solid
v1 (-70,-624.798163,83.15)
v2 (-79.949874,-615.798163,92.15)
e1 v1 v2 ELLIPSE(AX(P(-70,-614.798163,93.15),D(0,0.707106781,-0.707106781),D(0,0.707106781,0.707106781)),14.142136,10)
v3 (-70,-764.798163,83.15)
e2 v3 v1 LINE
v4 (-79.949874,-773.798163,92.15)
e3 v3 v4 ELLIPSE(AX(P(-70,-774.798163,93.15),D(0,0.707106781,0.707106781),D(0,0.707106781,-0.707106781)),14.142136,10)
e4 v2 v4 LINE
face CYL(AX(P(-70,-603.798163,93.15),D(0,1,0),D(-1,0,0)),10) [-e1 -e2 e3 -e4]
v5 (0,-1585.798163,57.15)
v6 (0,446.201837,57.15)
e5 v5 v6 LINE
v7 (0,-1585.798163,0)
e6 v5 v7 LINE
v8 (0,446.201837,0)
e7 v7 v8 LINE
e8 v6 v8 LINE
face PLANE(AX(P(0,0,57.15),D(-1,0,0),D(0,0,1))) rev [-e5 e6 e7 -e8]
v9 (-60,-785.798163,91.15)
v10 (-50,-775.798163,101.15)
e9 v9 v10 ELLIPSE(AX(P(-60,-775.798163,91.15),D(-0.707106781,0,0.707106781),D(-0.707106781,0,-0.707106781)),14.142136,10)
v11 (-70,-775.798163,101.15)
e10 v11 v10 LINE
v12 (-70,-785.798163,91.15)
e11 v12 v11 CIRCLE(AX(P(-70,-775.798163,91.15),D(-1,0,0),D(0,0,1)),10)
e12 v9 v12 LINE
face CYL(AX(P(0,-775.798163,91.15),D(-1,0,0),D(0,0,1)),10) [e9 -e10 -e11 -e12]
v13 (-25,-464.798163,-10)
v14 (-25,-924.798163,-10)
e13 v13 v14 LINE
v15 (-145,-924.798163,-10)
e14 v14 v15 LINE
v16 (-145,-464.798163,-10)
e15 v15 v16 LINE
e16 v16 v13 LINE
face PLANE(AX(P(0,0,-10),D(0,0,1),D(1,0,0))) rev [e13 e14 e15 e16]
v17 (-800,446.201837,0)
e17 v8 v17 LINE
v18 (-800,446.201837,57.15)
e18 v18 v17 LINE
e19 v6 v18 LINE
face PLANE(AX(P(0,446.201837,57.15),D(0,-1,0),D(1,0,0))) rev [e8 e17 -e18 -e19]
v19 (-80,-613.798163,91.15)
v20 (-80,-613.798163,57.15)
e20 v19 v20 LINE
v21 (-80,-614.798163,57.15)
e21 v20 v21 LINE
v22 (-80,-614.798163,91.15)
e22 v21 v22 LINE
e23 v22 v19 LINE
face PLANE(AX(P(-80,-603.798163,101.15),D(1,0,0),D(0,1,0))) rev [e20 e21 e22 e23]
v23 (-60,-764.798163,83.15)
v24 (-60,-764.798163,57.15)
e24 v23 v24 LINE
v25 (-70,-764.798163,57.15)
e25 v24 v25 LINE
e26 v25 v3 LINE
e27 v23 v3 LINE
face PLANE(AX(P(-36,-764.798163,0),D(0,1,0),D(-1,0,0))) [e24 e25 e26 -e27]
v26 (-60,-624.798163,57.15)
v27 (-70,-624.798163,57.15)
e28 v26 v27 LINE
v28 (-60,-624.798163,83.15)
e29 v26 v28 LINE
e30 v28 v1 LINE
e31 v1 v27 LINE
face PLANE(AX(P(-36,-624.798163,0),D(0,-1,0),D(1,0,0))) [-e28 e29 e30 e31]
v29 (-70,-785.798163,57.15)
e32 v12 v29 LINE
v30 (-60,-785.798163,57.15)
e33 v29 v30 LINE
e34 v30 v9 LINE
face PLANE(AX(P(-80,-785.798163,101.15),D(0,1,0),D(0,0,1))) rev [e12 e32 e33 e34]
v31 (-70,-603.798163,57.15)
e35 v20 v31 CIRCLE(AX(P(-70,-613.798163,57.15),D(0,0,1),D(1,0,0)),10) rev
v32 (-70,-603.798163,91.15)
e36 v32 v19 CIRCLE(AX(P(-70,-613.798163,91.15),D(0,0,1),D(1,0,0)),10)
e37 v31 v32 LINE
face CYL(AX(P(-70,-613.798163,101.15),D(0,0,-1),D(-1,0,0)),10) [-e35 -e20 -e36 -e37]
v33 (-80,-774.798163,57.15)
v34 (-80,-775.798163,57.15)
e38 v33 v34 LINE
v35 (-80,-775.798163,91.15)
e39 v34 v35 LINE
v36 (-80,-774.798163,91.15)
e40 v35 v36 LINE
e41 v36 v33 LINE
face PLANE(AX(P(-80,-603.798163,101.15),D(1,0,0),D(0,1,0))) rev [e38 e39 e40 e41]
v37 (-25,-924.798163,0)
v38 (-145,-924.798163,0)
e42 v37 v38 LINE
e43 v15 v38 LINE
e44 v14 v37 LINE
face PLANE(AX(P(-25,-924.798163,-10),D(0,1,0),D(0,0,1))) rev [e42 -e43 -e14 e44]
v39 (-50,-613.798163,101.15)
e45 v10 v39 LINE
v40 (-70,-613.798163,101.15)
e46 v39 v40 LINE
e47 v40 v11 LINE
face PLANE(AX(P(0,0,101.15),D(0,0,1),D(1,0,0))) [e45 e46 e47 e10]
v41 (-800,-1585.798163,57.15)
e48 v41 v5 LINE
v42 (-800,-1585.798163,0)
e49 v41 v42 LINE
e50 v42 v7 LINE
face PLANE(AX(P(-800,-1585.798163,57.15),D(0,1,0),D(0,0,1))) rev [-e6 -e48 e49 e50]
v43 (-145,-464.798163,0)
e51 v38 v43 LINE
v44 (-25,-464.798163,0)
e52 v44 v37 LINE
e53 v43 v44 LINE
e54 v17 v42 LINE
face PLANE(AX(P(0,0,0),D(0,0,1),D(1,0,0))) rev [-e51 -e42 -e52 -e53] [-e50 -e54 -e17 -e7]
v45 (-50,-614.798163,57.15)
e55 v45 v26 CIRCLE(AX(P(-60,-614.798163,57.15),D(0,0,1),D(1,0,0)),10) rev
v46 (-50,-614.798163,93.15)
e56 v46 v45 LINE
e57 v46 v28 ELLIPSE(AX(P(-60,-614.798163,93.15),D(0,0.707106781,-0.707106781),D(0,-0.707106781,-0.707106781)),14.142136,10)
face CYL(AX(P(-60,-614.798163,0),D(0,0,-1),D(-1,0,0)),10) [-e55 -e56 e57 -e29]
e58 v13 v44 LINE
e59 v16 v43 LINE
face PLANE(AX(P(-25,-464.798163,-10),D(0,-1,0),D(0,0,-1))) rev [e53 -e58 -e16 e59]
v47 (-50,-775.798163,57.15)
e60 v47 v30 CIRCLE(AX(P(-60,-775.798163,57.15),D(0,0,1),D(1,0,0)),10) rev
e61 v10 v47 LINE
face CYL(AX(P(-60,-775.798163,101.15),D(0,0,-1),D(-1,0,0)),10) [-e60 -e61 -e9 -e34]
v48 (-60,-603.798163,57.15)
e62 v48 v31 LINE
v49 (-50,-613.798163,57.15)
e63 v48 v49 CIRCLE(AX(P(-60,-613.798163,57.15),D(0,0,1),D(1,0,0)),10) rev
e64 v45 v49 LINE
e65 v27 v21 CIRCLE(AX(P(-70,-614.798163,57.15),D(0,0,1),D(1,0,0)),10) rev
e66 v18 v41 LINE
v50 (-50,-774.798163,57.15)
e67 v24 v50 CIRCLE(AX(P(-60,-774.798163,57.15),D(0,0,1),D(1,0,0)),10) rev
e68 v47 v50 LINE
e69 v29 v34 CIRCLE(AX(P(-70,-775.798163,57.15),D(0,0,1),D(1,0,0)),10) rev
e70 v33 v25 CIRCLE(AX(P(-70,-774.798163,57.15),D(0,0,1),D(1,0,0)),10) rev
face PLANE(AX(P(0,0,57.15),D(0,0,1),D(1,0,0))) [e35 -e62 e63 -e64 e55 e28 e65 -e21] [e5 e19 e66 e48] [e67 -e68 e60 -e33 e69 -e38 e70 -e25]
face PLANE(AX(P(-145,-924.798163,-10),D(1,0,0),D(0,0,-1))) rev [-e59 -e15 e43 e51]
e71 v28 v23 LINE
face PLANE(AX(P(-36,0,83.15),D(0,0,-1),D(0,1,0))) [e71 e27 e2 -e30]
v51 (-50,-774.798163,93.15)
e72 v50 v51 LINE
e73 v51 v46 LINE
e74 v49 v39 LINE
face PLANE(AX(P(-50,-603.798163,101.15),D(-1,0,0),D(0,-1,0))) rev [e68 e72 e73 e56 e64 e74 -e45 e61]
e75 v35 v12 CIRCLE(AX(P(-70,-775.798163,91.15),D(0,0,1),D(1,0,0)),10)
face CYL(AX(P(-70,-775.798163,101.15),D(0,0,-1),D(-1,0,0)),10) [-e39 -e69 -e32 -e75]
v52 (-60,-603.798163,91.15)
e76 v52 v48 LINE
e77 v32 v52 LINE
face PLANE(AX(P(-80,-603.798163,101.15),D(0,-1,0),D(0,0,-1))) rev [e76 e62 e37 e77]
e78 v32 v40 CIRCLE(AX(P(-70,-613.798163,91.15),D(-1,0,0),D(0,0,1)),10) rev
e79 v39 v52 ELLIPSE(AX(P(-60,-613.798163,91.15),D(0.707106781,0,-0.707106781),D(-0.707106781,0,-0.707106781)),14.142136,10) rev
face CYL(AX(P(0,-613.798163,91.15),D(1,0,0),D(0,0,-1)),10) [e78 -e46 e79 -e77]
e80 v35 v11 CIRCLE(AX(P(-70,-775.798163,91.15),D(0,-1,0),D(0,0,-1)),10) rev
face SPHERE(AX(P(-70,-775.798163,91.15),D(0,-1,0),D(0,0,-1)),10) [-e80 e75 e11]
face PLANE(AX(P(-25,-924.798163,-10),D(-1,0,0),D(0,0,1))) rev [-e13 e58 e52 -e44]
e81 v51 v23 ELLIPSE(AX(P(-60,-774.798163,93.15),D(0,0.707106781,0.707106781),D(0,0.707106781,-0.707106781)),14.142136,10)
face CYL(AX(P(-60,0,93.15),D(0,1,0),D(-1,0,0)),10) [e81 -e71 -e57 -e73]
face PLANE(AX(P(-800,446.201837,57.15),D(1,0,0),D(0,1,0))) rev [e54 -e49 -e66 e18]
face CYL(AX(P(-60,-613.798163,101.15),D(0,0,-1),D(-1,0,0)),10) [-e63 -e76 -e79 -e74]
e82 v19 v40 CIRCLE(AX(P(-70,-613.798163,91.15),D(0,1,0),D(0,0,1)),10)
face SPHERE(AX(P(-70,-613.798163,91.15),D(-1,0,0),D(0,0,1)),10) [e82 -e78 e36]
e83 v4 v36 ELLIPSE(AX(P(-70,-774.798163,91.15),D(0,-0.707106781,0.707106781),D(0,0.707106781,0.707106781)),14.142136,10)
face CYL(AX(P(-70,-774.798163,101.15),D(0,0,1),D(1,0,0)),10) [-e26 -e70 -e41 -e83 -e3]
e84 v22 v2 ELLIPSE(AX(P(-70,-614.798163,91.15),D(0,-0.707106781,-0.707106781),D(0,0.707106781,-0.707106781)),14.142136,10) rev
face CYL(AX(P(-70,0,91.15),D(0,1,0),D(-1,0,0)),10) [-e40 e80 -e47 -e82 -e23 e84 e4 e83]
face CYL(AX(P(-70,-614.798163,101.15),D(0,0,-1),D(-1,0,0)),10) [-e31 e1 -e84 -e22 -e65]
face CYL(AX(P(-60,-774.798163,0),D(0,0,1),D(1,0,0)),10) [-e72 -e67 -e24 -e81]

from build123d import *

# Parameters (mm, degrees)
BOSS_EXTRUDE2_DEPTH = 57.15
BOSS_EXTRUDE3_DEPTH = 44
CUT_EXTRUDE1_DEPTH  = 44
FILLET1_R           = 10
SKETCH6_W           = 120
SKETCH6_H           = 460.0000000000001
BOSS_EXTRUDE4_DEPTH = 10


with BuildPart() as part:
    # Sketch1 → Boss-Extrude2 (new body)
    with BuildSketch(Plane.XY):
        Polygon((0, 0), (0, 446.2018372120283), (-800, 446.2018372120282), (-799.9999999999998, -1585.7981627879717), (0, -1585.7981627879717), align=None)
    extrude(amount=BOSS_EXTRUDE2_DEPTH)

    # Sketch4 → Boss-Extrude3 (add)
    with BuildSketch(Plane.XY.offset(57.15)):
        Polygon((-79.99999999999993, -603.7981627879718), (-49.999999999999936, -603.7981627879718), (-49.999999999999915, -785.7981627879718), (-79.9999999999999, -785.7981627879718), align=None)
    extrude(amount=BOSS_EXTRUDE3_DEPTH)

    # Sketch5 → Cut-Extrude1 (cut)
    with BuildSketch(Plane.ZY.offset(80.00000000000003)):
        Polygon((83.14999999999999, -624.7981627879717), (57.150000000000006, -624.7981627879717), (57.15, -764.7981627879717), (83.15, -764.7981627879717), align=None)
    extrude(amount=-CUT_EXTRUDE1_DEPTH, mode=Mode.SUBTRACT)

    # Fillet1
    # the kernel refuses this fillet: 10 mm, written as the material it takes off along each edge
    with BuildSketch(Plane(origin=(-69.99999999999993, -613.7981627879718, 91.15), x_dir=(-1, -1.6e-16, 0), z_dir=(0, 1, 0))) as fillet1_piece_1_section:
        Polygon((0, 0), (FILLET1_R, 0), (FILLET1_R, FILLET1_R), (0, FILLET1_R), align=None)
    fillet1_piece_1 = extrude(amount=FILLET1_R, mode=Mode.PRIVATE)
    fillet1_piece_1 = fillet1_piece_1 - Plane(origin=(-69.99999999999993, -613.7981627879718, 91.15), x_dir=(0.7071067811865475, 0, -0.7071067811865475), z_dir=(0, 1, 0)) * Sphere(FILLET1_R, mode=Mode.PRIVATE)
    add(fillet1_piece_1, mode=Mode.SUBTRACT)
    with BuildSketch(Plane(origin=(-69.9999999999999, -775.7981627879718, 91.15), x_dir=(0, 0, 1), z_dir=(-1, -1.6e-16, 0))) as fillet1_piece_2_section:
        Polygon((0, 0), (FILLET1_R, 0), (FILLET1_R, -FILLET1_R), (0, -FILLET1_R), align=None)
    fillet1_piece_2 = extrude(amount=FILLET1_R, mode=Mode.PRIVATE)
    fillet1_piece_2 = fillet1_piece_2 - Plane(origin=(-69.9999999999999, -775.7981627879718, 91.15), x_dir=(0, 0.7071067811865475, -0.7071067811865475), z_dir=(-1, -1.6e-16, 0)) * Sphere(FILLET1_R, mode=Mode.PRIVATE)
    add(fillet1_piece_2, mode=Mode.SUBTRACT)
    with BuildSketch(Plane(origin=(-49.999999999999915, -785.7981627879718, 57.15), x_dir=(-1, 0, 0), z_dir=(0, 0, 1))) as fillet1_piece_3:
        with BuildLine():
            CenterArc((FILLET1_R, -FILLET1_R), FILLET1_R, 90, 90)
            Line((0, -FILLET1_R), (0, 0))
            Line((0, 0), (FILLET1_R, 0))
        make_face()
    extrude(amount=69, mode=Mode.SUBTRACT)
    with BuildSketch(Plane(origin=(-49.999999999999936, -603.7981627879718, 57.15), x_dir=(0, -1, 0), z_dir=(0, 0, 1))) as fillet1_piece_4:
        with BuildLine():
            CenterArc((FILLET1_R, -FILLET1_R), FILLET1_R, 90, 90)
            Line((0, -FILLET1_R), (0, 0))
            Line((0, 0), (FILLET1_R, 0))
        make_face()
    extrude(amount=69, mode=Mode.SUBTRACT)
    with BuildSketch(Plane(origin=(-79.99999999999993, -603.7981627879718, 57.15), x_dir=(1, 0, 0), z_dir=(0, 0, 1))) as fillet1_piece_5:
        with BuildLine():
            CenterArc((FILLET1_R, -FILLET1_R), FILLET1_R, 90, 90)
            Line((0, -FILLET1_R), (0, 0))
            Line((0, 0), (FILLET1_R, 0))
        make_face()
    extrude(amount=34.00000000000001, mode=Mode.SUBTRACT)
    with BuildSketch(Plane(origin=(-79.9999999999999, -785.7981627879718, 57.15), x_dir=(1, 0, 0), z_dir=(0, 0, 1))) as fillet1_piece_6:
        with BuildLine():
            CenterArc((FILLET1_R, FILLET1_R), FILLET1_R, 180, 90)
            Line((0, FILLET1_R), (0, 0))
            Line((0, 0), (FILLET1_R, 0))
        make_face()
    extrude(amount=34.00000000000001, mode=Mode.SUBTRACT)
    with BuildSketch(Plane(origin=(-69.99999999999993, -603.7981627879718, 101.15), x_dir=(0, 0, -1), z_dir=(1, 0, 0))) as fillet1_piece_7:
        with BuildLine():
            CenterArc((FILLET1_R, -FILLET1_R), FILLET1_R, 90, 90)
            Line((0, -FILLET1_R), (0, 0))
            Line((0, 0), (FILLET1_R, 0))
        make_face()
    extrude(amount=44.99999999999999, mode=Mode.SUBTRACT)
    with BuildSketch(Plane(origin=(-79.9999999999999, -775.7981627879718, 101.15), x_dir=(0, 0, -1), z_dir=(-1.6e-16, 1, 0))) as fillet1_piece_8:
        with BuildLine():
            CenterArc((FILLET1_R, -FILLET1_R), FILLET1_R, 90, 90)
            Line((0, -FILLET1_R), (0, 0))
            Line((0, 0), (FILLET1_R, 0))
        make_face()
    extrude(amount=162, mode=Mode.SUBTRACT)
    with BuildSketch(Plane(origin=(-24.999999999999915, -785.7981627879718, 101.15), x_dir=(0, 0, -1), z_dir=(-1, 0, 0))) as fillet1_piece_9:
        with BuildLine():
            CenterArc((FILLET1_R, -FILLET1_R), FILLET1_R, 90, 90)
            Line((0, -FILLET1_R), (0, 0))
            Line((0, 0), (FILLET1_R, 0))
        make_face()
    extrude(amount=44.999999999999986, mode=Mode.SUBTRACT)
    with BuildSketch(Plane(origin=(-79.99999999999991, -764.7981627879717, 57.15000000000002), x_dir=(1.42e-15, -1, 0), z_dir=(0, 0, 1))) as fillet1_piece_10:
        with BuildLine():
            CenterArc((FILLET1_R, FILLET1_R), FILLET1_R, 180, 89.99999999999989)
            Line((1.421e-14, FILLET1_R), (0, 0))
            Line((0, 0), (FILLET1_R, 0))
        make_face()
    extrude(amount=25.999999999999986, mode=Mode.SUBTRACT)
    with BuildSketch(Plane(origin=(-79.99999999999993, -624.7981627879717, 83.14999999999999), x_dir=(0, 1, 0), z_dir=(0, 0, -1))) as fillet1_piece_11:
        with BuildLine():
            CenterArc((FILLET1_R, FILLET1_R), FILLET1_R, 180, 90)
            Line((0, FILLET1_R), (0, 0))
            Line((0, 0), (FILLET1_R, 0))
        make_face()
    extrude(amount=25.999999999999986, mode=Mode.SUBTRACT)
    with BuildSketch(Plane(origin=(-79.99999999999991, -764.7981627879717, 83.15), x_dir=(1.42e-15, 1e-16, 1), z_dir=(-1.5e-16, 1, -1e-16))) as fillet1_piece_12:
        with BuildLine():
            CenterArc((FILLET1_R, FILLET1_R), FILLET1_R, 180, 89.99999999999989)
            Line((1.421e-14, FILLET1_R), (0, 0))
            Line((0, 0), (FILLET1_R, 0))
        make_face()
    extrude(amount=140, mode=Mode.SUBTRACT)
    with BuildSketch(Plane(origin=(-49.999999999999915, -764.7981627879717, 83.15), x_dir=(0, -1, 0), z_dir=(0, 0, -1))) as fillet1_piece_13:
        with BuildLine():
            CenterArc((FILLET1_R, FILLET1_R), FILLET1_R, 180, 90)
            Line((0, FILLET1_R), (0, 0))
            Line((0, 0), (FILLET1_R, 0))
        make_face()
    extrude(amount=26, mode=Mode.SUBTRACT)
    with BuildSketch(Plane(origin=(-49.999999999999936, -624.7981627879717, 57.150000000000006), x_dir=(0, 1, 0), z_dir=(0, 0, 1))) as fillet1_piece_14:
        with BuildLine():
            CenterArc((FILLET1_R, FILLET1_R), FILLET1_R, 180.00000000000003, 90)
            Line((0, FILLET1_R), (0, 0))
            Line((0, 0), (FILLET1_R, 0))
        make_face()
    extrude(amount=25.999999999999986, mode=Mode.SUBTRACT)
    with BuildSketch(Plane(origin=(-49.999999999999936, -624.7981627879717, 83.15), x_dir=(0, 1e-16, 1), z_dir=(1.2e-16, -1, 1e-16))) as fillet1_piece_15:
        with BuildLine():
            CenterArc((FILLET1_R, FILLET1_R), FILLET1_R, 180, 90)
            Line((0, FILLET1_R), (0, 0))
            Line((0, 0), (FILLET1_R, 0))
        make_face()
    extrude(amount=140, mode=Mode.SUBTRACT)
    with BuildSketch(Plane(origin=(-79.99999999999991, -764.7981627879717, 57.15000000000002), x_dir=(1.42e-15, -1, 0), z_dir=(0, 0, 1))) as fillet1_piece_16a_section:
        with BuildLine():
            CenterArc((FILLET1_R, FILLET1_R), FILLET1_R, 180, 89.99999999999989)
            Line((1.421e-14, FILLET1_R), (0, 0))
            Line((0, 0), (FILLET1_R, 0))
        make_face()
    fillet1_piece_16a = extrude(amount=50.999999999999986, mode=Mode.PRIVATE)
    fillet1_piece_16a = split(fillet1_piece_16a, bisect_by=Plane(origin=(-77.7360488573316, -767.0621139306398, 83.15), z_dir=(0, 1e-16, 1)), keep=Keep.TOP, mode=Mode.PRIVATE)
    with BuildSketch(Plane(origin=(-79.9999999999999, -789.7981627879717, 83.15), x_dir=(0, 1e-16, 1), z_dir=(-1.5e-16, 1, -1e-16))) as fillet1_piece_16b_section:
        with BuildLine():
            CenterArc((FILLET1_R, FILLET1_R), FILLET1_R, 180, 90)
            Line((0, FILLET1_R), (0, 0))
            Line((0, 0), (FILLET1_R, 0))
        make_face()
    fillet1_piece_16b = extrude(amount=165, mode=Mode.PRIVATE)
    fillet1_piece_16b = split(fillet1_piece_16b, bisect_by=Plane(origin=(-77.73604885733165, -764.7981627879717, 85.41395114266827), z_dir=(1.5e-16, -1, 0)), keep=Keep.TOP, mode=Mode.PRIVATE)
    fillet1_piece_16 = fillet1_piece_16a & fillet1_piece_16b
    add(fillet1_piece_16, mode=Mode.SUBTRACT)
    with BuildSketch(Plane(origin=(-79.99999999999991, -764.7981627879717, 83.15), x_dir=(1.42e-15, 1e-16, 1), z_dir=(-1.5e-16, 1, -1e-16))) as fillet1_piece_17a_section:
        with BuildLine():
            CenterArc((FILLET1_R, FILLET1_R), FILLET1_R, 180, 89.99999999999989)
            Line((1.421e-14, FILLET1_R), (0, 0))
            Line((0, 0), (FILLET1_R, 0))
        make_face()
    fillet1_piece_17a = extrude(amount=165, mode=Mode.PRIVATE)
    fillet1_piece_17a = split(fillet1_piece_17a, bisect_by=Plane(origin=(-77.73604885733167, -624.7981627879717, 85.41395114266825), z_dir=(-1.5e-16, 1, 0)), keep=Keep.TOP, mode=Mode.PRIVATE)
    with BuildSketch(Plane(origin=(-79.99999999999993, -624.7981627879717, 108.14999999999998), x_dir=(0, 1, 0), z_dir=(0, 0, -1))) as fillet1_piece_17b_section:
        with BuildLine():
            CenterArc((FILLET1_R, FILLET1_R), FILLET1_R, 180, 90)
            Line((0, FILLET1_R), (0, 0))
            Line((0, 0), (FILLET1_R, 0))
        make_face()
    fillet1_piece_17b = extrude(amount=50.999999999999986, mode=Mode.PRIVATE)
    fillet1_piece_17b = split(fillet1_piece_17b, bisect_by=Plane(origin=(-77.73604885733164, -622.5342116453035, 83.14999999999999), z_dir=(0, 1e-16, 1)), keep=Keep.TOP, mode=Mode.PRIVATE)
    fillet1_piece_17 = fillet1_piece_17a & fillet1_piece_17b
    add(fillet1_piece_17, mode=Mode.SUBTRACT)
    with BuildSketch(Plane(origin=(-49.999999999999936, -624.7981627879717, 83.15), x_dir=(0, 1e-16, 1), z_dir=(1.2e-16, -1, 1e-16))) as fillet1_piece_18a_section:
        with BuildLine():
            CenterArc((FILLET1_R, FILLET1_R), FILLET1_R, 180, 90)
            Line((0, FILLET1_R), (0, 0))
            Line((0, 0), (FILLET1_R, 0))
        make_face()
    fillet1_piece_18a = extrude(amount=165, mode=Mode.PRIVATE)
    fillet1_piece_18a = split(fillet1_piece_18a, bisect_by=Plane(origin=(-52.26395114266817, -764.7981627879717, 85.41395114266827), z_dir=(1.5e-16, -1, 0)), keep=Keep.TOP, mode=Mode.PRIVATE)
    with BuildSketch(Plane(origin=(-49.999999999999915, -764.7981627879717, 108.15), x_dir=(0, -1, 0), z_dir=(0, 0, -1))) as fillet1_piece_18b_section:
        with BuildLine():
            CenterArc((FILLET1_R, FILLET1_R), FILLET1_R, 180, 90)
            Line((0, FILLET1_R), (0, 0))
            Line((0, 0), (FILLET1_R, 0))
        make_face()
    fillet1_piece_18b = extrude(amount=51, mode=Mode.PRIVATE)
    fillet1_piece_18b = split(fillet1_piece_18b, bisect_by=Plane(origin=(-52.2639511426682, -767.0621139306397, 83.15), z_dir=(0, 1e-16, 1)), keep=Keep.TOP, mode=Mode.PRIVATE)
    fillet1_piece_18 = fillet1_piece_18a & fillet1_piece_18b
    add(fillet1_piece_18, mode=Mode.SUBTRACT)
    with BuildSketch(Plane(origin=(-49.999999999999936, -624.7981627879717, 57.150000000000006), x_dir=(0, 1, 0), z_dir=(0, 0, 1))) as fillet1_piece_19a_section:
        with BuildLine():
            CenterArc((FILLET1_R, FILLET1_R), FILLET1_R, 180.00000000000003, 90)
            Line((0, FILLET1_R), (0, 0))
            Line((0, 0), (FILLET1_R, 0))
        make_face()
    fillet1_piece_19a = extrude(amount=50.999999999999986, mode=Mode.PRIVATE)
    fillet1_piece_19a = split(fillet1_piece_19a, bisect_by=Plane(origin=(-52.26395114266823, -622.5342116453035, 83.14999999999999), z_dir=(0, 1e-16, 1)), keep=Keep.TOP, mode=Mode.PRIVATE)
    with BuildSketch(Plane(origin=(-49.999999999999936, -599.7981627879717, 83.14999999999999), x_dir=(0, 1e-16, 1), z_dir=(1.2e-16, -1, 1e-16))) as fillet1_piece_19b_section:
        with BuildLine():
            CenterArc((FILLET1_R, FILLET1_R), FILLET1_R, 179.99999999999997, 90)
            Line((0, FILLET1_R), (0, 0))
            Line((0, 0), (FILLET1_R, 0))
        make_face()
    fillet1_piece_19b = extrude(amount=165, mode=Mode.PRIVATE)
    fillet1_piece_19b = split(fillet1_piece_19b, bisect_by=Plane(origin=(-52.26395114266818, -624.7981627879717, 85.41395114266824), z_dir=(-1.5e-16, 1, 0)), keep=Keep.TOP, mode=Mode.PRIVATE)
    fillet1_piece_19 = fillet1_piece_19a & fillet1_piece_19b
    add(fillet1_piece_19, mode=Mode.SUBTRACT)

    # Sketch6 → Boss-Extrude4 (add)
    with BuildSketch(Plane(origin=(0, 0, 0), x_dir=(-1, 0, 0), z_dir=(0, 0, -1))):
        with Locations((85, -694.7981627879719)):
            Rectangle(SKETCH6_W, SKETCH6_H)
    extrude(amount=BOSS_EXTRUDE4_DEPTH)


solid = part.part
